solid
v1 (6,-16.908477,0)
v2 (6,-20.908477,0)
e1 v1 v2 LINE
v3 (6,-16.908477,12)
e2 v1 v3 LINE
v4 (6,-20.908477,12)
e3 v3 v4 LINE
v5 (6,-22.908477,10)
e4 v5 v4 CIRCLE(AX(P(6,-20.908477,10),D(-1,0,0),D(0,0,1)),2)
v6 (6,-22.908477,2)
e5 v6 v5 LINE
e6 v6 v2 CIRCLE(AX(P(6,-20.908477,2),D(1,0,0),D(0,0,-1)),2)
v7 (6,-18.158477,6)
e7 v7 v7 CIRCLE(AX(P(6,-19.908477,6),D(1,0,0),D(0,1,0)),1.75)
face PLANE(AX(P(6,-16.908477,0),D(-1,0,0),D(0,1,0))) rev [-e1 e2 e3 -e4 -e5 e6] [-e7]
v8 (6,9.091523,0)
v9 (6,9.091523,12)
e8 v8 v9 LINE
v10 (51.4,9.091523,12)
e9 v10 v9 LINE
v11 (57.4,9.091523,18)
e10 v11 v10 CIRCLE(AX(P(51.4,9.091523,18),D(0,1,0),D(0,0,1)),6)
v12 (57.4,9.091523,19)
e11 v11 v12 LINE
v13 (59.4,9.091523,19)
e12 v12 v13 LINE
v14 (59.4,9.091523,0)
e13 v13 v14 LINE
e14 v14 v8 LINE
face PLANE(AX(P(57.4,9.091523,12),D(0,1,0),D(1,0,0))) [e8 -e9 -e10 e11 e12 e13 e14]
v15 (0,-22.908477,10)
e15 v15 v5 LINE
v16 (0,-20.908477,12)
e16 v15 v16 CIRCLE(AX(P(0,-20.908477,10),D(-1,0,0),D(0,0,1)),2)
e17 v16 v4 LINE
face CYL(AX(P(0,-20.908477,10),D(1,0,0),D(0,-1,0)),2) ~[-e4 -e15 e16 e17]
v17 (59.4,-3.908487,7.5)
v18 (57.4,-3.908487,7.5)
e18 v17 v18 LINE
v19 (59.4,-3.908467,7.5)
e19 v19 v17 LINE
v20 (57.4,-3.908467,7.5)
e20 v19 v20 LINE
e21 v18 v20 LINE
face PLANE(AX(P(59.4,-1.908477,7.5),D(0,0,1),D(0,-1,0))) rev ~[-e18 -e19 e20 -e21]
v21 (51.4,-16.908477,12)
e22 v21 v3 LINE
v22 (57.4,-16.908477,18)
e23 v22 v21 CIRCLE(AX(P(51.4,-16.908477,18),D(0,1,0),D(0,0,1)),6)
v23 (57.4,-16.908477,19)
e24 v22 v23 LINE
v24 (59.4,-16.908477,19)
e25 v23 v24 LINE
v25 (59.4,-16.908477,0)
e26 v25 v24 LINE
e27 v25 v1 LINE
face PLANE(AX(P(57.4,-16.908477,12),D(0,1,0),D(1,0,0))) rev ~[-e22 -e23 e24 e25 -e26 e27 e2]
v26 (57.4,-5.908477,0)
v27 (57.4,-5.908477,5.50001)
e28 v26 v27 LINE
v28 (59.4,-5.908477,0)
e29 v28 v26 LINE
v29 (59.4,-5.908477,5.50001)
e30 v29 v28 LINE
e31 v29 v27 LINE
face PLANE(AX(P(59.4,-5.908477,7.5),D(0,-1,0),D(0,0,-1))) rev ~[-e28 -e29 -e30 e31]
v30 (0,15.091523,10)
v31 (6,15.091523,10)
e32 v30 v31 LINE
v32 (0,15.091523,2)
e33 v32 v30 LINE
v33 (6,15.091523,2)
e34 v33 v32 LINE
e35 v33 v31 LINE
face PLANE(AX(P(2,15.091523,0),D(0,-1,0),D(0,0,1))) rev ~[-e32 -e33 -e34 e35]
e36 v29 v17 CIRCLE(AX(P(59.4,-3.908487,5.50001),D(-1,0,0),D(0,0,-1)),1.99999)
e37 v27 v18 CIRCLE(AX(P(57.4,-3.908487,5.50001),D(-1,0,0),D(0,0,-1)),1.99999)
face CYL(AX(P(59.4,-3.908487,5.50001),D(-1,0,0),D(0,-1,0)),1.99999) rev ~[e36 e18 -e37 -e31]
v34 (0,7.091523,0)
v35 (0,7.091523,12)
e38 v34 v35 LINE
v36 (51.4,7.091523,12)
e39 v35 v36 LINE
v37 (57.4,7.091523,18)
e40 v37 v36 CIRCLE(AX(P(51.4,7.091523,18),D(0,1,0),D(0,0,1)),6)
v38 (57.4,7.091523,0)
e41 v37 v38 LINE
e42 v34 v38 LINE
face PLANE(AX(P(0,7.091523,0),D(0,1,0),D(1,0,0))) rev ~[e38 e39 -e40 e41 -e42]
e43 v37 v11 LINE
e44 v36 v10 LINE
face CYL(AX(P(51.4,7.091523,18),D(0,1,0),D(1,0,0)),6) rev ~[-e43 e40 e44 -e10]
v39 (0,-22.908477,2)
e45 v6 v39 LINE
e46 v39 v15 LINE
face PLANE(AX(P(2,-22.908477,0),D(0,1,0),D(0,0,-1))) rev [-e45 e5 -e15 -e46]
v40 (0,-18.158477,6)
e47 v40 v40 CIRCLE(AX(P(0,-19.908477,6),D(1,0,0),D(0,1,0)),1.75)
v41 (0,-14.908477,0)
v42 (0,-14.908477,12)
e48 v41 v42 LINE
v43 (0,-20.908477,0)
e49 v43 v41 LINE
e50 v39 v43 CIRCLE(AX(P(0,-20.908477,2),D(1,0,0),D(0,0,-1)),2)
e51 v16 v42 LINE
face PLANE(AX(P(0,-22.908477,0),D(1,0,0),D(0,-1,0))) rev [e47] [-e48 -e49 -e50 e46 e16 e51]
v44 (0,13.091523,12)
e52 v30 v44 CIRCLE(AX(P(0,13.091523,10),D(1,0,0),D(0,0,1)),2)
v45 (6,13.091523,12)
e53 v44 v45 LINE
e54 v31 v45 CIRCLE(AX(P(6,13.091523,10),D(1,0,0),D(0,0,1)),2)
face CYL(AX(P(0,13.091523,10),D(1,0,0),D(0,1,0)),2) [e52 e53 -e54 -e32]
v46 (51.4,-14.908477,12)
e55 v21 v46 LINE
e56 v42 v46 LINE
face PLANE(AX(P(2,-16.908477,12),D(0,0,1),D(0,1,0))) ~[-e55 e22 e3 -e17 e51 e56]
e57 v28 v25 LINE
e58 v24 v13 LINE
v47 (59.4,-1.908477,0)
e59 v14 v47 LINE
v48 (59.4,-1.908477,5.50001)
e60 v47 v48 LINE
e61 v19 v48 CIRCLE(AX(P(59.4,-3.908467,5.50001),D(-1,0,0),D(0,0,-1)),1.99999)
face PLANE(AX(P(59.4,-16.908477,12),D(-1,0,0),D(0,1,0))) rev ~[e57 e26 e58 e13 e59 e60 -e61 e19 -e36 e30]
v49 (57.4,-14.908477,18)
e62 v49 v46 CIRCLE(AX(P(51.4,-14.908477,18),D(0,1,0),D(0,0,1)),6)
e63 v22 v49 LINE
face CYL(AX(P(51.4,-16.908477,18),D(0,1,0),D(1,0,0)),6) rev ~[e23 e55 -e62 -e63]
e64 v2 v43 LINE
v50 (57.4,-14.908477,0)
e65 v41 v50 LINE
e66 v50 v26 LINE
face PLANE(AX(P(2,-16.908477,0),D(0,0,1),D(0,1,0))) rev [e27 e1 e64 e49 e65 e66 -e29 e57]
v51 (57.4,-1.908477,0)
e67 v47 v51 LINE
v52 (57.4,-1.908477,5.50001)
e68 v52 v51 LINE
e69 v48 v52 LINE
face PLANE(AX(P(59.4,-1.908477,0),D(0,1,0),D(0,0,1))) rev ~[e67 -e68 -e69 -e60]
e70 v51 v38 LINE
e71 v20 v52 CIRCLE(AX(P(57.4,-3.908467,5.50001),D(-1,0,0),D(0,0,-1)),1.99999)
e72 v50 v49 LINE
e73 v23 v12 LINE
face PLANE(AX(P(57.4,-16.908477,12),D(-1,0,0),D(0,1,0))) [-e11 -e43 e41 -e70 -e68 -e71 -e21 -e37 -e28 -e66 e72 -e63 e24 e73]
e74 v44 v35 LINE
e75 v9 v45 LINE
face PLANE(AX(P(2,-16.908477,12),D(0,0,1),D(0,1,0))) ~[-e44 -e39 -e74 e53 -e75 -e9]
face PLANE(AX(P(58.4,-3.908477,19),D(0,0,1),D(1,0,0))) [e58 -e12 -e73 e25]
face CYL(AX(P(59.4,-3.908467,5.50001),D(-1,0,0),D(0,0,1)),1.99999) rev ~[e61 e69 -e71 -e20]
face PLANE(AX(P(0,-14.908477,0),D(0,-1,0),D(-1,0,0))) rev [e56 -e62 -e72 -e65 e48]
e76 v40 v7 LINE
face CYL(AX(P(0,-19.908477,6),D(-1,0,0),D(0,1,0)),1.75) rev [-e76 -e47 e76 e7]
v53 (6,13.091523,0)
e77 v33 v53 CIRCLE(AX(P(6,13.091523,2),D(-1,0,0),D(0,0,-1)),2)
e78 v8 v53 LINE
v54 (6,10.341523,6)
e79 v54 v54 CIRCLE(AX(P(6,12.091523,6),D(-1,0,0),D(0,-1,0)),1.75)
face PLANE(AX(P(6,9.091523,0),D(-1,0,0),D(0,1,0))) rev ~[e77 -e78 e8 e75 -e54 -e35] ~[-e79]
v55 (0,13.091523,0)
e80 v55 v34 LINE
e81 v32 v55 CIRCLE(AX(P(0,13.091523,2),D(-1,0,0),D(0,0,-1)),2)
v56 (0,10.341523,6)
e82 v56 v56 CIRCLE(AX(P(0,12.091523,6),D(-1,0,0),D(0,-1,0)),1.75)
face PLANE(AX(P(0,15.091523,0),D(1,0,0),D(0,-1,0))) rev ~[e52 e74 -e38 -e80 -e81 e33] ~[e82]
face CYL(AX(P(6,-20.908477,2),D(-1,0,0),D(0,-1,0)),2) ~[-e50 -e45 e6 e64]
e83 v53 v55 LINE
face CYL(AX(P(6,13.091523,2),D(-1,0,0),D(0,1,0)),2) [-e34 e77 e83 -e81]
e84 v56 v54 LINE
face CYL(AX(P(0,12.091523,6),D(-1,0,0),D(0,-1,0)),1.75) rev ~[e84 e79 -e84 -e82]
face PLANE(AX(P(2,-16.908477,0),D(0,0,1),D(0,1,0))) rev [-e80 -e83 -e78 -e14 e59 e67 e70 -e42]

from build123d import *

# Parameters (mm, degrees)
F1_DEPTH  = 12
F3_DEPTH  = 4
F2_R      = 1.75
F4_DEPTH  = 25
F5_R      = 2
F8_DEPTH  = 25
F9_W      = 2
F9_H      = 26
F10_DEPTH = 7
F11_R     = 6
F12_R     = 1.99999


# Not quite as in the source:
# - a fillet or chamfer is up to 0.001 mm smaller than in the source, because OpenCascade refuses the exact size


with BuildPart() as f1:
    # F0 (on Top) → F1 (new body)
    with BuildSketch(Plane.XY):
        Polygon((2, 15.0915228184), (0, 15.0915228184), (0, 7.0915228184), (57.4, 7.0915228184), (57.4, -3.9084771816), (59.4, -3.9084771816), (59.4, 9.0915228184), (2, 9.0915228184), align=None)
    extrude(amount=F1_DEPTH)

    # F3 (add): a face of the model
    f3_faces = [f1.faces().sort_by_distance(p)[0] for p in [
        (2, 12.0915228184, 6),
    ]]
    extrude(f3_faces, amount=F3_DEPTH)

    # F2 (on face) → F4 (cut)
    with BuildSketch(Plane(origin=(0, 0, 0), x_dir=(0, -1, 0), z_dir=(-1, 0, 0))):
        with Locations((-12.0915228184, 6)):
            Circle(F2_R)
    extrude(amount=-F4_DEPTH, mode=Mode.SUBTRACT)

    # F5
    f5_edges = [f1.edges().sort_by_distance(p)[0] for p in [
        (3, 15.091523, 0),
        (3, 15.091523, 12),
    ]]
    fillet(f5_edges, radius=F5_R)

    # F6: F1 across face


with BuildPart() as f1_1:
    add(f1.part)
    add(f1.part.mirror(Plane(origin=(58.4, -3.9084771816, 6), x_dir=(1, 0, 0), z_dir=(0, -1, 0))))

    # F7 (on face) → F8 (cut)
    with BuildSketch(Plane.YZ.offset(59.4)):
        Polygon((-1.9084771816, 7.5), (-3.9084771816, 7.5), (-5.9084771816, 7.5), (-5.9084771816, 0), (-1.9084771816, 0), align=None)
    extrude(amount=-F8_DEPTH, mode=Mode.SUBTRACT)

    # F9 (on face) → F10 (join)
    with BuildSketch(Plane.XY.offset(12)):
        with Locations((58.4, -3.9084771816)):
            Rectangle(F9_W, F9_H)
    extrude(amount=F10_DEPTH)

    # F11
    f11_edges = [f1_1.edges().sort_by_distance(p)[0] for p in [
        (57.4, -15.908477, 12),
        (57.4, 8.091523, 12),
    ]]
    fillet(f11_edges, radius=F11_R)

    # F12 (radius 2 in the source; OpenCascade refuses exactly that, so slightly less here)
    f12_edges = [f1_1.edges().sort_by_distance(p)[0] for p in [
        (58.4, -1.908477, 7.5),
        (58.4, -5.908477, 7.5),
    ]]
    fillet(f12_edges, radius=F12_R)


solid = f1_1.part
